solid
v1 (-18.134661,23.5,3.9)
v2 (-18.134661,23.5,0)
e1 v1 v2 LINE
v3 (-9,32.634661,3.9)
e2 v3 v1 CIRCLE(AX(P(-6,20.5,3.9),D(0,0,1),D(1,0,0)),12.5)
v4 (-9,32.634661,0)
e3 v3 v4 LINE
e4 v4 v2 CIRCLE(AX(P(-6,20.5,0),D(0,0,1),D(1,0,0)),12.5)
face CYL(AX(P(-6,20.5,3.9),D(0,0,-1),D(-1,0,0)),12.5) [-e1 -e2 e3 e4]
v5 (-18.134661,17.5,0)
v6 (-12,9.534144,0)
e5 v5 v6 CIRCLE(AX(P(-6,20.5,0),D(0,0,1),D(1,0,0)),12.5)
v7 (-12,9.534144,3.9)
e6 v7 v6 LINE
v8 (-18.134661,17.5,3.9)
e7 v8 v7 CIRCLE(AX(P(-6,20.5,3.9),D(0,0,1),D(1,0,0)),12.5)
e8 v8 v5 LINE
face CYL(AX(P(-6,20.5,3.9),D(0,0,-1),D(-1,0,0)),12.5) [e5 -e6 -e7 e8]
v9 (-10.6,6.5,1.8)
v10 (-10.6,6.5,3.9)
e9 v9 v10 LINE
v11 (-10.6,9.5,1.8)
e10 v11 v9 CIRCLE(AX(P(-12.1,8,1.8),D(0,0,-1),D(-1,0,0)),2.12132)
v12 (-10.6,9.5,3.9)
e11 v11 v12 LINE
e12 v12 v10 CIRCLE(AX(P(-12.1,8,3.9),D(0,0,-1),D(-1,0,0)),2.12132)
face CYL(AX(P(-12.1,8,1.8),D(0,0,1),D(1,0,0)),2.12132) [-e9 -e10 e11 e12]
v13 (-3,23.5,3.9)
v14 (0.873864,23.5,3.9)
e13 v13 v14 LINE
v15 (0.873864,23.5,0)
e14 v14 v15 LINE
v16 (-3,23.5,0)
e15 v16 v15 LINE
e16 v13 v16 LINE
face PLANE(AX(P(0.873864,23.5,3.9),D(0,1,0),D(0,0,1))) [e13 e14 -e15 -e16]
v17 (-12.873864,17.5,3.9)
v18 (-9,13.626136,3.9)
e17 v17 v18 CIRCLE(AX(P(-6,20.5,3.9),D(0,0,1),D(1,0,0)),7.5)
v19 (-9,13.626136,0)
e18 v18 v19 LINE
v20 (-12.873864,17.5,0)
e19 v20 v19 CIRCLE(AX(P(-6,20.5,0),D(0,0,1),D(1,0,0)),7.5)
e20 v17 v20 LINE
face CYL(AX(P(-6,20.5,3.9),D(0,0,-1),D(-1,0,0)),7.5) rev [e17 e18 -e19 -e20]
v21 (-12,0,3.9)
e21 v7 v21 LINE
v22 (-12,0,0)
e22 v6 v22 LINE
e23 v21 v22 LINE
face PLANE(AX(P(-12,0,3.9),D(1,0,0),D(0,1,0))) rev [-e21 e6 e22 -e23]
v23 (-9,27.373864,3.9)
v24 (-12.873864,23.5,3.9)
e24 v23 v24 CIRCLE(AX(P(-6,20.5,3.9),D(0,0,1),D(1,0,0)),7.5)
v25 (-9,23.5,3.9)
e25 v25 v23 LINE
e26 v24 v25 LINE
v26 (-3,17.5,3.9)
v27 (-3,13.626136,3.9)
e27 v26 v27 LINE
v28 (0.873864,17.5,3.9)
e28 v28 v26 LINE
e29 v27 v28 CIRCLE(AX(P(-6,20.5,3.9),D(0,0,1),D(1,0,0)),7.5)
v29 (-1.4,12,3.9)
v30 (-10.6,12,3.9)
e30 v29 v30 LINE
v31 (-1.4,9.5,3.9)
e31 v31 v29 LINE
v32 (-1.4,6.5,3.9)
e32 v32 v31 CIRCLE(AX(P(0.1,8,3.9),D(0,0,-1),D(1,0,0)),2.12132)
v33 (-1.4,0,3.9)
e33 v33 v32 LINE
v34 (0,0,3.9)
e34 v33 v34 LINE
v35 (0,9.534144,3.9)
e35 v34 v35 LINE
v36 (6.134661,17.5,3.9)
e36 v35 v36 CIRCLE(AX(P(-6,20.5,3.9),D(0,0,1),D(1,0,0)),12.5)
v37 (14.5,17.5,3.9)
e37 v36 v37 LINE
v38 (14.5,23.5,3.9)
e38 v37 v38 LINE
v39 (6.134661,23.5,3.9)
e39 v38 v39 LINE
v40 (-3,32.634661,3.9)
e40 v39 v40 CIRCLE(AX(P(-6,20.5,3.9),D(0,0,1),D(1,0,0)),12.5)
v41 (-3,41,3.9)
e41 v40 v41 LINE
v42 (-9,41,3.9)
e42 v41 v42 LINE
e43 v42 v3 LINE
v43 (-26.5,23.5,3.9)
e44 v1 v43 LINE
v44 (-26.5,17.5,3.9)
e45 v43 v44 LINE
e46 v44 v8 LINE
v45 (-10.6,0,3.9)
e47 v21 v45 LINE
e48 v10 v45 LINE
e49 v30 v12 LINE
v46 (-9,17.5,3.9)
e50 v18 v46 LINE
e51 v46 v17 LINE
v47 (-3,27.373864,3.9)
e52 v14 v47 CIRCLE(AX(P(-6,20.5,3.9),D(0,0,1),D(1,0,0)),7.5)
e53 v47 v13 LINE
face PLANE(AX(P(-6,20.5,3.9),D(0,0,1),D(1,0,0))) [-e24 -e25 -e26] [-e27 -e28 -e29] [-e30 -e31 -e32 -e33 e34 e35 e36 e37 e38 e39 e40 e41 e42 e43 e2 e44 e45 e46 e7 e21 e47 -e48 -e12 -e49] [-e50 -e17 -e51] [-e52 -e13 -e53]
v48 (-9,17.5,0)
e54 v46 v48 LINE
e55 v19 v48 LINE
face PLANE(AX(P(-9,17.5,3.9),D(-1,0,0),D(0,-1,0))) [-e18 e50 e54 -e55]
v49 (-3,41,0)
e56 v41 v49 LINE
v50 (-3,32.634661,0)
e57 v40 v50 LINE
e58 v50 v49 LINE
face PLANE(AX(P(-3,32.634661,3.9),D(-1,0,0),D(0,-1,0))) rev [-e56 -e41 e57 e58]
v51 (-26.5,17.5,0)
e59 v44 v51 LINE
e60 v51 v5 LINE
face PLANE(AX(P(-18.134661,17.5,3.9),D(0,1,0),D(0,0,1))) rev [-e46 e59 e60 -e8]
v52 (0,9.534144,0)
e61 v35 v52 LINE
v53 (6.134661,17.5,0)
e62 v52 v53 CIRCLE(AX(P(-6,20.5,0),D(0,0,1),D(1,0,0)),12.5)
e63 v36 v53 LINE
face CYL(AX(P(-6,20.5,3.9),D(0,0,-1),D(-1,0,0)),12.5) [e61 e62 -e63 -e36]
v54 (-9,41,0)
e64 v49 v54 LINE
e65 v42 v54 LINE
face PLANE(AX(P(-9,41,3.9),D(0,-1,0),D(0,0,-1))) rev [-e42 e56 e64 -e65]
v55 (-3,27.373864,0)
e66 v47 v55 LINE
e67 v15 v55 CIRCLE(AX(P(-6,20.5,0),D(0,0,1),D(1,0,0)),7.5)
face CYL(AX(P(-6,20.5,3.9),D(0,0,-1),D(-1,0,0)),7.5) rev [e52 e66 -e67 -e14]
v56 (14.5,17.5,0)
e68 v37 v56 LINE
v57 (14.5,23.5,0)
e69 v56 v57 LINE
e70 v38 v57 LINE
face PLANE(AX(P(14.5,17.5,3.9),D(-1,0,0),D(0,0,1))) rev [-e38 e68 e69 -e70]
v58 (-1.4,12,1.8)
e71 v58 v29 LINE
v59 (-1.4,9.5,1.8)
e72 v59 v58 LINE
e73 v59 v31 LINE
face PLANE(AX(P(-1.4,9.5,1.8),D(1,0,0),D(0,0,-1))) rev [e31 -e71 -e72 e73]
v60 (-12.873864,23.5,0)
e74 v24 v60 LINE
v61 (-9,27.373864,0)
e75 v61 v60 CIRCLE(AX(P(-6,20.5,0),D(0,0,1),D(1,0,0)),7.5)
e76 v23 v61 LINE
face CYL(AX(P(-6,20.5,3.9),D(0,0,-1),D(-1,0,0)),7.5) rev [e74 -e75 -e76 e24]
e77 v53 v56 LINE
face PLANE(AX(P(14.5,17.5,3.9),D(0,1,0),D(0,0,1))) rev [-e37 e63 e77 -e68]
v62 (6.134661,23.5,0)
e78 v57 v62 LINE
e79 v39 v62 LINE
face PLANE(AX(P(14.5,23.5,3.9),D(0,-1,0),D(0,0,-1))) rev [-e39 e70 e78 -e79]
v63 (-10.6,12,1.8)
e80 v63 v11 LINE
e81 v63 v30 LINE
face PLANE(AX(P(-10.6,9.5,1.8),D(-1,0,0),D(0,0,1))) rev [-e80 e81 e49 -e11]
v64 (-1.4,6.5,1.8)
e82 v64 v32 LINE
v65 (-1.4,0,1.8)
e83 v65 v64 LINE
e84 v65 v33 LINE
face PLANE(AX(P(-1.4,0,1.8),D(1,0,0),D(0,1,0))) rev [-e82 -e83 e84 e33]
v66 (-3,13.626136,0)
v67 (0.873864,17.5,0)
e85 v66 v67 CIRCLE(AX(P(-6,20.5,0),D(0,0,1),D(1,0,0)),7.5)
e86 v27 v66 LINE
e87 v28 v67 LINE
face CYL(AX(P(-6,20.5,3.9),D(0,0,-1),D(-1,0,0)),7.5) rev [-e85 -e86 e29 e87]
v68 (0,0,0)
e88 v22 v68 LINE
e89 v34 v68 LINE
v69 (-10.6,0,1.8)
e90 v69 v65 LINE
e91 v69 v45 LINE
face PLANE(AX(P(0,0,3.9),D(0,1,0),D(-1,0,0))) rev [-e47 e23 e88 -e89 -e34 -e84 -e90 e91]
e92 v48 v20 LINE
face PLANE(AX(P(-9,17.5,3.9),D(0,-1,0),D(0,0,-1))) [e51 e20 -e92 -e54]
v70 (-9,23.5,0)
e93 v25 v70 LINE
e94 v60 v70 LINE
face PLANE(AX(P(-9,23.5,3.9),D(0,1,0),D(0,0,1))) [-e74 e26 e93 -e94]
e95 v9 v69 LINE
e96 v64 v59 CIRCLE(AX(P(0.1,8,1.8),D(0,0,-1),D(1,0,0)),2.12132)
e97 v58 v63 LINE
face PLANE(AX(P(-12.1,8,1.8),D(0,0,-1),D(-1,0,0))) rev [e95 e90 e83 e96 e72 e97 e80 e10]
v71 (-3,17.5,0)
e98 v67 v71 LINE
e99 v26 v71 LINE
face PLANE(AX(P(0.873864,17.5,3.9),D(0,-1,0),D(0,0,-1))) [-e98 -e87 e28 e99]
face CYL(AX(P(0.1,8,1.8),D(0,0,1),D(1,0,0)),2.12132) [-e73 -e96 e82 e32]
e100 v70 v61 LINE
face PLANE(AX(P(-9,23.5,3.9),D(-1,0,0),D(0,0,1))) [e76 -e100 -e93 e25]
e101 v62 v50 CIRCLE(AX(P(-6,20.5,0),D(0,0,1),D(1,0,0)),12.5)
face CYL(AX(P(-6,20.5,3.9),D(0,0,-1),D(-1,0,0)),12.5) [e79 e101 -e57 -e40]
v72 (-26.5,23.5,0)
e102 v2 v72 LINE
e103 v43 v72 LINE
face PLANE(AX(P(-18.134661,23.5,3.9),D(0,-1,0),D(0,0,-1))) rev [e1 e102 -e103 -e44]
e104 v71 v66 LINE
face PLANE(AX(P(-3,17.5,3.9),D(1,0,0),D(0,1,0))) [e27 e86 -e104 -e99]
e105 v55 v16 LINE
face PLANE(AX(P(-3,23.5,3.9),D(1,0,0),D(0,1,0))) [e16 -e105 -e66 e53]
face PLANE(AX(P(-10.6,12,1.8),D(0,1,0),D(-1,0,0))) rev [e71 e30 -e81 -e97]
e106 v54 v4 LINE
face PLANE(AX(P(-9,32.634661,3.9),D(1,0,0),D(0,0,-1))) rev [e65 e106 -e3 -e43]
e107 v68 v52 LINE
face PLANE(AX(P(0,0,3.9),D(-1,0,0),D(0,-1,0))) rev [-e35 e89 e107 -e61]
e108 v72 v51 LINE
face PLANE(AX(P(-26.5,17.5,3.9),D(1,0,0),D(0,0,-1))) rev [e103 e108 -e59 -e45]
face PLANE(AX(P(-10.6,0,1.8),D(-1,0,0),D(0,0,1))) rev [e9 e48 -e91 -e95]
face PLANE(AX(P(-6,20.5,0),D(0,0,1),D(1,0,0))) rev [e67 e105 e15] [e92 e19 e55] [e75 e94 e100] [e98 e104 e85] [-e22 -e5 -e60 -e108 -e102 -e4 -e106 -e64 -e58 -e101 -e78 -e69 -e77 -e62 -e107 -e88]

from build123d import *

# Parameters (mm, degrees)
SALIENTE_EXTRUIR1_DEPTH = 3.9
CORTAR_EXTRUIR1_DEPTH   = 2.1


with BuildPart() as part:
    # Croquis1 → Saliente-Extruir1 (new body)
    with BuildSketch(Plane.XY):
        with BuildLine():
            Line((0, 0), (-12, 0))
            Line((-12, 0), (-12, 9.5341439))
            ThreePointArc((-12, 9.5341439), (-15.903544777, 12.873087069), (-18.1346611, 17.5))
            Line((-18.1346611, 17.5), (-26.5, 17.5))
            Line((-26.5, 17.5), (-26.5, 23.5))
            Line((-26.5, 23.5), (-18.1346611, 23.5))
            ThreePointArc((-18.1346611, 23.5), (-14.838834765, 29.338834765), (-9, 32.6346611))
            Line((-9, 32.6346611), (-9, 41))
            Line((-9, 41), (-3, 41))
            Line((-3, 41), (-3, 32.6346611))
            ThreePointArc((-3, 32.6346611), (2.838834765, 29.338834765), (6.1346611, 23.5))
            Line((6.1346611, 23.5), (14.5, 23.5))
            Line((14.5, 23.5), (14.5, 17.5))
            Line((14.5, 17.5), (6.1346611, 17.5))
            ThreePointArc((6.1346611, 17.5), (3.903544777, 12.873087069), (0, 9.5341439))
            Line((0, 9.5341439), (0, 0))
        make_face()
        with BuildLine():
            Line((-9, 23.5), (-9, 27.373863542))
            ThreePointArc((-9, 27.373863542), (-11.303300859, 25.803300859), (-12.873863542, 23.5))
            Line((-12.873863542, 23.5), (-9, 23.5))
        make_face(mode=Mode.SUBTRACT)
        with BuildLine():
            Line((-3, 23.5), (-3, 27.373863542))
            ThreePointArc((-3, 27.373863542), (-0.696699141, 25.803300859), (0.873863542, 23.5))
            Line((0.873863542, 23.5), (-3, 23.5))
        make_face(mode=Mode.SUBTRACT)
        with BuildLine():
            Line((-9, 17.5), (-9, 13.626136458))
            ThreePointArc((-9, 13.626136458), (-11.303300859, 15.196699141), (-12.873863542, 17.5))
            Line((-12.873863542, 17.5), (-9, 17.5))
        make_face(mode=Mode.SUBTRACT)
        with BuildLine():
            Line((-3, 17.5), (-3, 13.626136458))
            ThreePointArc((-3, 13.626136458), (-0.696699141, 15.196699141), (0.873863542, 17.5))
            Line((0.873863542, 17.5), (-3, 17.5))
        make_face(mode=Mode.SUBTRACT)
    extrude(amount=SALIENTE_EXTRUIR1_DEPTH)

    # Croquis2 → Cortar-Extruir1 (cut)
    with BuildSketch(Plane.XY.offset(3.9)):
        with BuildLine():
            Line((-10.6, 0), (-1.4, 0))
            Line((-1.4, 0), (-1.4, 6.5))
            ThreePointArc((-1.4, 6.5), (-2.021320344, 8), (-1.4, 9.5))
            Line((-1.4, 9.5), (-1.4, 12))
            Line((-1.4, 12), (-10.6, 12))
            Line((-10.6, 12), (-10.6, 9.5))
            ThreePointArc((-10.6, 9.5), (-9.978679656, 8), (-10.6, 6.5))
            Line((-10.6, 6.5), (-10.6, 0))
        make_face()
    extrude(amount=-CORTAR_EXTRUIR1_DEPTH, mode=Mode.SUBTRACT)


solid = part.part
